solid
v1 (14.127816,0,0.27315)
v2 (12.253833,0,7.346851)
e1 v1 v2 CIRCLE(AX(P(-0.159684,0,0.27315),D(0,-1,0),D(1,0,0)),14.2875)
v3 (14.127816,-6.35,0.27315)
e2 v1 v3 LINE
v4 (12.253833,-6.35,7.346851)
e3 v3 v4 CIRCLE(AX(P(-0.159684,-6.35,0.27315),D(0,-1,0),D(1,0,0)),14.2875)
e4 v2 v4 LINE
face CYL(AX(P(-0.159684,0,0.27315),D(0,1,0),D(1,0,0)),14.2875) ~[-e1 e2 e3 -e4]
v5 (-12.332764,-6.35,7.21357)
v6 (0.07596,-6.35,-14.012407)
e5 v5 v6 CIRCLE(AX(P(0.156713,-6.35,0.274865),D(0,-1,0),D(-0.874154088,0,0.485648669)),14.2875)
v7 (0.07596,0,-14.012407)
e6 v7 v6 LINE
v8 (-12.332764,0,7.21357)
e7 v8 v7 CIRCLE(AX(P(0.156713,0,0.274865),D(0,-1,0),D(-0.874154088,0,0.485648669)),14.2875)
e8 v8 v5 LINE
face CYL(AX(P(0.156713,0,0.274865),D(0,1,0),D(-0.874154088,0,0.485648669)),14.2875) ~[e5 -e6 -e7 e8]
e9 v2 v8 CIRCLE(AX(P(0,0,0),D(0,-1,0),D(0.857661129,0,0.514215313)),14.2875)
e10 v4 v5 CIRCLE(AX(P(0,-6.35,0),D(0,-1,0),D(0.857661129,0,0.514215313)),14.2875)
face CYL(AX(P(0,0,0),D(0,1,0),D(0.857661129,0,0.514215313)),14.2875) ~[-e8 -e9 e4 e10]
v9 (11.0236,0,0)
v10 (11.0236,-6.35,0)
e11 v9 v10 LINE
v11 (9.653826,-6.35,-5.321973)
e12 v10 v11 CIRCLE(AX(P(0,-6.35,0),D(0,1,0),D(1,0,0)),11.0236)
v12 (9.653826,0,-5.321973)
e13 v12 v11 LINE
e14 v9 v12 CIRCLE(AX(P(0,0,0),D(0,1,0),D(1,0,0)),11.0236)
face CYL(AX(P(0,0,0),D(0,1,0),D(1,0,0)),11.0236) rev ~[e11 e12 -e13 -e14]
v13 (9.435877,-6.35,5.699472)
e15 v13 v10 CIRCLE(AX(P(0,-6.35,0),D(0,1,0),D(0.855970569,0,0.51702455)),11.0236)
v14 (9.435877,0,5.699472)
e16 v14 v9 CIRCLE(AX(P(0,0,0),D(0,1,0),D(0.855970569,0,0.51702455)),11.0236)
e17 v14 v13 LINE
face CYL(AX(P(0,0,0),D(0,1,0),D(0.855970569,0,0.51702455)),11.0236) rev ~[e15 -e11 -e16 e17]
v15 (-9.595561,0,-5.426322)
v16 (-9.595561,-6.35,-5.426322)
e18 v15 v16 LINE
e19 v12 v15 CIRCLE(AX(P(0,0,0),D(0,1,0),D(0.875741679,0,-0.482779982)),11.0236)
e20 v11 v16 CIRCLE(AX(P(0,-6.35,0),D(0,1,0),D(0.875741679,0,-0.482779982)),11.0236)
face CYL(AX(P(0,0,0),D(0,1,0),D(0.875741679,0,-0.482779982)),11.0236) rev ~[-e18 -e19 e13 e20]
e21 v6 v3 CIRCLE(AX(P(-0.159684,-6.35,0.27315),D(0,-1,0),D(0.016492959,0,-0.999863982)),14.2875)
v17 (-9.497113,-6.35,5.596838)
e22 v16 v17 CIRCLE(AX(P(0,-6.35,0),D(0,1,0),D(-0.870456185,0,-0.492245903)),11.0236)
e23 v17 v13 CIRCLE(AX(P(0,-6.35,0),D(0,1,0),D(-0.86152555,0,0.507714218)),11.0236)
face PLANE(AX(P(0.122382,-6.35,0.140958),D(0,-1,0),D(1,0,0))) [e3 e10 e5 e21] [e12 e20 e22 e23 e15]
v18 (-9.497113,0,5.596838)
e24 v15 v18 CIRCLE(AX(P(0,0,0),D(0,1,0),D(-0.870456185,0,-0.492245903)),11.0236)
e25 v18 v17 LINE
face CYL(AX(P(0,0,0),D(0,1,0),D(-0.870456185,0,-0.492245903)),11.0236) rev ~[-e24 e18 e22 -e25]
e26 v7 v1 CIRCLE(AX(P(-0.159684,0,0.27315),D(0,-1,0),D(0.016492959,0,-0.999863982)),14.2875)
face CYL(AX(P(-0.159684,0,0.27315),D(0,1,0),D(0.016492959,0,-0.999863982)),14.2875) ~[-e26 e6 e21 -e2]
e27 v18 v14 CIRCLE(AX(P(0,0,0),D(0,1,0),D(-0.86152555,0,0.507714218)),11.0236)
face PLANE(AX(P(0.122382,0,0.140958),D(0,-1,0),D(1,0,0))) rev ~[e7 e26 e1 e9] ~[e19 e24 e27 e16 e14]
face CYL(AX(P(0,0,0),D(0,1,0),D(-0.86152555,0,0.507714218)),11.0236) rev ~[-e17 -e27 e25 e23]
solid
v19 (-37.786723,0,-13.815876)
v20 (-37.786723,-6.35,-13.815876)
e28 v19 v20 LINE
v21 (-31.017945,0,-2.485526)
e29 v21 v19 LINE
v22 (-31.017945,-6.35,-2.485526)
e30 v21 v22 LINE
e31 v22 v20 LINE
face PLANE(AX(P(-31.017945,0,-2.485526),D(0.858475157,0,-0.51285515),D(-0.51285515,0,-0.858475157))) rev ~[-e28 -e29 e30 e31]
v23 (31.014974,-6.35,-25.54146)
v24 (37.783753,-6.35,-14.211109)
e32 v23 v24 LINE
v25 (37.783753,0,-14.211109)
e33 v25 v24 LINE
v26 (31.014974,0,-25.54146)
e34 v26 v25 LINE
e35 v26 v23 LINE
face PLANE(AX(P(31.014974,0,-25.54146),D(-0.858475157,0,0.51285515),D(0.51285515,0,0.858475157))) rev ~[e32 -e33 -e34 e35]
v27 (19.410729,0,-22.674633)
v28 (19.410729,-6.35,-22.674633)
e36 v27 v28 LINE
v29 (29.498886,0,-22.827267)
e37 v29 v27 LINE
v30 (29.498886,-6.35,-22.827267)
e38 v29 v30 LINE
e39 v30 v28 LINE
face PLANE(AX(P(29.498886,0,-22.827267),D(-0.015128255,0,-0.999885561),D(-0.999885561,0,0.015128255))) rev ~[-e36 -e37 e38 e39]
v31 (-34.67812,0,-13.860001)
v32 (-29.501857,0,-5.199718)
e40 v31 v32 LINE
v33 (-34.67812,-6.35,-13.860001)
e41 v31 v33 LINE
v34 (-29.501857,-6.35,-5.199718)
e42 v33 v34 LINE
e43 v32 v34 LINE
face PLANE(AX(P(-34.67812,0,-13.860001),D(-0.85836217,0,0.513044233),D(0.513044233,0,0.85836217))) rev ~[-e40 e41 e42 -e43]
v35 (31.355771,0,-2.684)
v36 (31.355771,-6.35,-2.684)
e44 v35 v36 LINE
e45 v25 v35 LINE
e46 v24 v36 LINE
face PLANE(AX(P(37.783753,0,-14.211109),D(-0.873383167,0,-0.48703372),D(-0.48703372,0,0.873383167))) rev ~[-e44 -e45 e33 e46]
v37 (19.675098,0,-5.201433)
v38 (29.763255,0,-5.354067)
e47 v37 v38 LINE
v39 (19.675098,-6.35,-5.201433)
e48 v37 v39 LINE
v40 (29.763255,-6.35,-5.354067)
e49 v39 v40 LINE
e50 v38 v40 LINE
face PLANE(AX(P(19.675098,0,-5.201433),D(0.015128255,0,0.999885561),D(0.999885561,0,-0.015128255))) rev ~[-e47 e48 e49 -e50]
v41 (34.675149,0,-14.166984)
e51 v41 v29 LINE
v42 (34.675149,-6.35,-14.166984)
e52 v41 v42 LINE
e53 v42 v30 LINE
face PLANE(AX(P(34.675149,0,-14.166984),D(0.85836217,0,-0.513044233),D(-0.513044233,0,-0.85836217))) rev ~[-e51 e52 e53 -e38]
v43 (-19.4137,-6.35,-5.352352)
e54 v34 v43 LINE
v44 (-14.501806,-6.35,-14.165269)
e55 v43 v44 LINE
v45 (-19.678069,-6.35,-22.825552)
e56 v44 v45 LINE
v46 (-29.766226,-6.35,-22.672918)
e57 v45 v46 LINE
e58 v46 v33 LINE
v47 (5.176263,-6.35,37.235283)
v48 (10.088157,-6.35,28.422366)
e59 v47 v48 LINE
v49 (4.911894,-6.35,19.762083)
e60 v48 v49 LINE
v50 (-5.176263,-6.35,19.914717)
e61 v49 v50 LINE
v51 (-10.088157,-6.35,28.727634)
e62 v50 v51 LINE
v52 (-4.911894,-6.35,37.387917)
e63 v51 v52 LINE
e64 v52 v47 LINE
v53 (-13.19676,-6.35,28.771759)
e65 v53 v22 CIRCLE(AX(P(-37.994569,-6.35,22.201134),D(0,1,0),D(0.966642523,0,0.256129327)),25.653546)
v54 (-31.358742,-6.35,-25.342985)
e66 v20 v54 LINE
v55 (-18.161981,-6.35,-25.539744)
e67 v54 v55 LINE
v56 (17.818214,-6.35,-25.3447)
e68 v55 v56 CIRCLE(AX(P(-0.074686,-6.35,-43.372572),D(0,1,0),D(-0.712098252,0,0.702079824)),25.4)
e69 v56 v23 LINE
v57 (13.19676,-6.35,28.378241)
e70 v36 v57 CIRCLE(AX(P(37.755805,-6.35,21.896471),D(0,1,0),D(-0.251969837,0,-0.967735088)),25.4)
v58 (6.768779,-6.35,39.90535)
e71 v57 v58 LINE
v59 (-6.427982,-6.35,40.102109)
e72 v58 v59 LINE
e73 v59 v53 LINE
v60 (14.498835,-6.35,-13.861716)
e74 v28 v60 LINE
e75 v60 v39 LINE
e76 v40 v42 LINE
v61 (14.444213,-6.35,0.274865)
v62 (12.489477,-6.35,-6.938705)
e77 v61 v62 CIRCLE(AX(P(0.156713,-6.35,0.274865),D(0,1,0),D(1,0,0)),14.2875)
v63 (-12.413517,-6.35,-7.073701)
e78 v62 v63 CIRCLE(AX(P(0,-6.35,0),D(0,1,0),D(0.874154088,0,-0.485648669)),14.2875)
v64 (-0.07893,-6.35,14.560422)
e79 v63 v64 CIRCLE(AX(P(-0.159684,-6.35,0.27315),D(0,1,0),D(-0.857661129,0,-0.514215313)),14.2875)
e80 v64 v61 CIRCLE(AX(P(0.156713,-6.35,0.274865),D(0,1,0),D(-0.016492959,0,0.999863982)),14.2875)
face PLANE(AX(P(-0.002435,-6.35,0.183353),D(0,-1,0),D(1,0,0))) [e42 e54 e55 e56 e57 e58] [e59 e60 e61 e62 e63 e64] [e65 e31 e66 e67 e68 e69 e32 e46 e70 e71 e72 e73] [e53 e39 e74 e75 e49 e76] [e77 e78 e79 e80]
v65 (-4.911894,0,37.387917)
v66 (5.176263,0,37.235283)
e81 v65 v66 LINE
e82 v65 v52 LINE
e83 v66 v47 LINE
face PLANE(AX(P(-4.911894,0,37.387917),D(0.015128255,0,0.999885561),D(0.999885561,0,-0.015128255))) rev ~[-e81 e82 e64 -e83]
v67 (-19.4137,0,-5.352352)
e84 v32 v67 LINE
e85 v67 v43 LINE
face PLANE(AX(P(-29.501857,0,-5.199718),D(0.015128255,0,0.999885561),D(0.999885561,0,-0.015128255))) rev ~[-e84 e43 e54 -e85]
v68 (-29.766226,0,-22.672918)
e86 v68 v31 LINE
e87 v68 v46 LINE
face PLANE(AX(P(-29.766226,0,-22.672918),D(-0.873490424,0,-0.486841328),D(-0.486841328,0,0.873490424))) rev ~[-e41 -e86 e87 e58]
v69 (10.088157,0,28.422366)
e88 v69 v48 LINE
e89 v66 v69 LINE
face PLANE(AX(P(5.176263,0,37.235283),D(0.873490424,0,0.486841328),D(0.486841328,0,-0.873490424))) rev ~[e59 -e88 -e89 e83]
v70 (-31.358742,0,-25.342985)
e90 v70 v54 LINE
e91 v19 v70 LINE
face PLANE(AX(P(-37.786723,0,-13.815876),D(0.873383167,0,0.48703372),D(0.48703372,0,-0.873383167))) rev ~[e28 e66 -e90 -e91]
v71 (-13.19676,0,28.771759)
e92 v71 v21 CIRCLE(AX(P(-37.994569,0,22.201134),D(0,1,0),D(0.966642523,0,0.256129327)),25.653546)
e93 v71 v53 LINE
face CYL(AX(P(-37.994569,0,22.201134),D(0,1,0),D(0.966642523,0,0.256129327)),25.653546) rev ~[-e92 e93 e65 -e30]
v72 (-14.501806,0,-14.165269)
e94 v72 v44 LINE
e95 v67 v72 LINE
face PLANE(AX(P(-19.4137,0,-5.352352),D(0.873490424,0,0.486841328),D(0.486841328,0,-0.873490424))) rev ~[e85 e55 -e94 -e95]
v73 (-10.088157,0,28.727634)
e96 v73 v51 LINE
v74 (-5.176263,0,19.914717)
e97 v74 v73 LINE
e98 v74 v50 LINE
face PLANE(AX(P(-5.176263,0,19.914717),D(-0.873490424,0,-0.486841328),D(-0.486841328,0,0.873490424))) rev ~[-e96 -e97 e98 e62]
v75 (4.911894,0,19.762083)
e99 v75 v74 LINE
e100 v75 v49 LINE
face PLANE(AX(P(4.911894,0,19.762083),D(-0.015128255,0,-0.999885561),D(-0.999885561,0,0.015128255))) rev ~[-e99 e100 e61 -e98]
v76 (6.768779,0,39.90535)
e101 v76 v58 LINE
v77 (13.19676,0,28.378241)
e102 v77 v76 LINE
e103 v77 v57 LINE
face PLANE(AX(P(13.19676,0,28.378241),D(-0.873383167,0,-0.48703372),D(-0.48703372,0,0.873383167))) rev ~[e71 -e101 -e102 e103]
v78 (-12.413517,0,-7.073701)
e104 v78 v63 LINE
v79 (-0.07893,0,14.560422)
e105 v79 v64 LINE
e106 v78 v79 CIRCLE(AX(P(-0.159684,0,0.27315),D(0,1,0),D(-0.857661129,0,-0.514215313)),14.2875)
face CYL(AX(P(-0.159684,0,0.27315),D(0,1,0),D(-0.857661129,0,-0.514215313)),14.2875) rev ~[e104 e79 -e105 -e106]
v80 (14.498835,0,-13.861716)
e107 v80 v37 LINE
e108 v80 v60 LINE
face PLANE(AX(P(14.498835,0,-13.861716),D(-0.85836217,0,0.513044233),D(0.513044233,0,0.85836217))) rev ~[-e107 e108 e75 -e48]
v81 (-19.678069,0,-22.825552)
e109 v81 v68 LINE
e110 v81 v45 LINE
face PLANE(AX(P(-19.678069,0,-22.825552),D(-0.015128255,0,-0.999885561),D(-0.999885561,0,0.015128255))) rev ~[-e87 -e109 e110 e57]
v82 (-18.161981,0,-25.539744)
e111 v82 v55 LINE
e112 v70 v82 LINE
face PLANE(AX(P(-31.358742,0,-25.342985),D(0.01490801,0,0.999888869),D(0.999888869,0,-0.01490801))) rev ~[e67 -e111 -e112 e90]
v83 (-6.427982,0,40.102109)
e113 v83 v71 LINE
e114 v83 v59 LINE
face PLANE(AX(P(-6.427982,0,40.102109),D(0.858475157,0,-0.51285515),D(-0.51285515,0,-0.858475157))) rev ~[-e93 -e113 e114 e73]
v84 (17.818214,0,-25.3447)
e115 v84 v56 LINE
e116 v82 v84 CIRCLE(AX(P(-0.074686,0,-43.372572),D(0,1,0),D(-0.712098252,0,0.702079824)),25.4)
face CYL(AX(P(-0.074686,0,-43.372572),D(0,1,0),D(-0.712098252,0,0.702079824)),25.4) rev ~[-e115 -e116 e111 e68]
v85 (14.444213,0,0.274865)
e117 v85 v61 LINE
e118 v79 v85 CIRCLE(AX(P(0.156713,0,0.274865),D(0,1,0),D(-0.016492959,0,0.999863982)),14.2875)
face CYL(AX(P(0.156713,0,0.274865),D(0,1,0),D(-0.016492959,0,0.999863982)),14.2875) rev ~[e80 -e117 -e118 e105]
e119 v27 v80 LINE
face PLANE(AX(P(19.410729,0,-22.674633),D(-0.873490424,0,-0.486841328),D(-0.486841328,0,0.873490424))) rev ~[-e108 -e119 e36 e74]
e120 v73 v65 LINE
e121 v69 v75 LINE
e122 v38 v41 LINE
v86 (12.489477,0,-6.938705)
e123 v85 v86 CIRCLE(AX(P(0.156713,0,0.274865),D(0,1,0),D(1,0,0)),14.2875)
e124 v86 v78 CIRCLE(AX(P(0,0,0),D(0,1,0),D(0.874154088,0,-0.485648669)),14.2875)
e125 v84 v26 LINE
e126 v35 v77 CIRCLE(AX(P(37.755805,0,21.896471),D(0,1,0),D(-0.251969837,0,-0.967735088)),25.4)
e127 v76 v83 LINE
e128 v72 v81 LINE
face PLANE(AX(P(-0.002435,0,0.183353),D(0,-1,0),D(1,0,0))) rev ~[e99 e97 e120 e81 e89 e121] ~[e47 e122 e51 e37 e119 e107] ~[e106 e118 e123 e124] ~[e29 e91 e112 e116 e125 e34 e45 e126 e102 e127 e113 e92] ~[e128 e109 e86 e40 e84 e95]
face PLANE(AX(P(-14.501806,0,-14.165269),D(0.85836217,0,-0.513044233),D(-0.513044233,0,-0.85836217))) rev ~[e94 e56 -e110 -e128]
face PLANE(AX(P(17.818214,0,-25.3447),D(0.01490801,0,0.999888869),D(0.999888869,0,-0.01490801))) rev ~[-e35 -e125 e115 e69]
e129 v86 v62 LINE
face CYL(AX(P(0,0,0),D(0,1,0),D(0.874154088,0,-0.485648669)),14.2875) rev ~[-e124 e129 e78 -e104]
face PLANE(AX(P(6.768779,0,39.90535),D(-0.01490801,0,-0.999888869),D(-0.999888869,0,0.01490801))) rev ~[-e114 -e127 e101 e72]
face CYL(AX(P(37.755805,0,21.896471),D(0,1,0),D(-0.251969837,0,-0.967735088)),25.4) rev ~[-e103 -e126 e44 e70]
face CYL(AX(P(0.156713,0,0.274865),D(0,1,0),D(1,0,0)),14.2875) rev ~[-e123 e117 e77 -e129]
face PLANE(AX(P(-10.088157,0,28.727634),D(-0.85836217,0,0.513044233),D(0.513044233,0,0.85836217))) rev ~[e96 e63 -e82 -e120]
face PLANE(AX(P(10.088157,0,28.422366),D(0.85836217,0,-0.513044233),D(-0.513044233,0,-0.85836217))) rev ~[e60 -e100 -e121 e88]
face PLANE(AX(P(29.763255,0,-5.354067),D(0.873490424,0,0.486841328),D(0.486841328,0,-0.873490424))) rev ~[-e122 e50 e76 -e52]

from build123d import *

# Parameters (mm, degrees)
F1_DEPTH = 6.35


# Not quite as in the source:
# - a feature names something its author has since deleted; it is built from what else it names


with BuildPart() as f1:
    # F0 (on Front) → F1 (new body)
    with BuildSketch(Plane.XZ):
        with BuildLine():
            ThreePointArc((14.1278163557, 0.2731498923), (13.651376792, 3.9320111734), (12.2538333812, 7.346851279))
            ThreePointArc((12.2538333812, 7.346851279), (-0.0774496188, 14.2872900792), (-12.3327636124, 7.2135704011))
            ThreePointArc((-12.3327636124, 7.2135704011), (-12.1777184268, -6.9358533383), (0.0759595105, -14.012406749))
            ThreePointArc((0.0759595105, -14.012406749), (10.026076215, -9.745979428), (14.1278163557, 0.2731498923))
        make_face()
        with BuildLine():
            ThreePointArc((11.1803129237, 0.2748650387), (10.7918465004, -2.6257712301), (9.6538259749, -5.3219734128))
            ThreePointArc((9.6538259749, -5.3219734128), (0.0597566836, -11.0234380344), (-9.5955608055, -5.4263219393))
            ThreePointArc((-9.5955608055, -5.4263219393), (-9.736139361, 5.7331181035), (-0.0612358901, 11.2963102831))
            ThreePointArc((-0.0612358901, 11.2963102831), (7.874134009, 8.1464067398), (11.1803129237, 0.2748650387))
        make_face(mode=Mode.SUBTRACT)
        with BuildLine():
            ThreePointArc((9.4358771612, 5.6994718316), (10.6192535621, 2.9582445374), (11.0236, 0))
            ThreePointArc((11.0236, 0), (10.6756656227, -2.7477118611), (9.6538259749, -5.3219734128))
            ThreePointArc((9.6538259749, -5.3219734128), (10.7918465004, -2.6257712301), (11.1803129237, 0.2748650387))
            ThreePointArc((11.1803129237, 0.2748650387), (7.874134009, 8.1464067398), (-0.0612358901, 11.2963102831))
            ThreePointArc((-0.0612358901, 11.2963102831), (5.4371548072, 9.7702629436), (9.4358771612, 5.6994718316))
        make_face()
        with BuildLine():
            ThreePointArc((-9.4971130513, 5.5968384515), (-0.0597566836, 11.0234380344), (9.4358771612, 5.6994718316))
            ThreePointArc((9.4358771612, 5.6994718316), (5.4371548072, 9.7702629436), (-0.0612358901, 11.2963102831))
            ThreePointArc((-0.0612358901, 11.2963102831), (-5.542758908, 9.7107421999), (-9.4971130513, 5.5968384515))
        make_face()
        with BuildLine():
            ThreePointArc((-9.5955608055, -5.4263219393), (-11.0231603907, 0.0984477542), (-9.4971130513, 5.5968384515))
            ThreePointArc((-9.4971130513, 5.5968384515), (-5.542758908, 9.7107421999), (-0.0612358901, 11.2963102831))
            ThreePointArc((-0.0612358901, 11.2963102831), (-9.736139361, 5.7331181035), (-9.5955608055, -5.4263219393))
        make_face()
    extrude(amount=F1_DEPTH)


with BuildPart() as f1b:
    # F0 (on Front) → F1, piece 2 (new body)
    with BuildSketch(Plane.XZ):
        with BuildLine():
            ThreePointArc((31.3557710331, -2.6839999789), (15.827926935, 9.0774163735), (13.1967604274, 28.378240702))
            Line((13.1967604274, 28.378240702), (6.4279816632, 17.0478905732))
            Line((6.4279816632, 17.0478905732), (-6.7687787642, 17.2446498712))
            Line((-6.7687787642, 17.2446498712), (-13.1967604274, 28.771759298))
            ThreePointArc((-13.1967604274, 28.771759298), (-15.7087414623, 9.494980858), (-31.0179446527, -2.4855255345))
            Line((-31.0179446527, -2.4855255345), (-17.8211842253, -2.6822848325))
            Line((-17.8211842253, -2.6822848325), (-11.3932025621, -14.2093942593))
            Line((-11.3932025621, -14.2093942593), (-18.1619813263, -25.5397443881))
            ThreePointArc((-18.1619813263, -25.5397443881), (-0.2123739316, -17.9729451093), (17.8182135046, -25.3447002365))
            Line((17.8182135046, -25.3447002365), (11.3902318414, -13.8175908097))
            Line((11.3902318414, -13.8175908097), (18.1590106056, -2.4872406809))
            Line((18.1590106056, -2.4872406809), (31.3557710331, -2.6839999789))
        make_face()
        with BuildLine():
            ThreePointArc((14.4442129237, 0.2748650387), (13.9468727552, -3.4619983612), (12.489476536, -6.9387053624))
            ThreePointArc((12.489476536, -6.9387053624), (0.0774496188, -14.2872900792), (-12.4135170255, -7.0737013866))
            ThreePointArc((-12.4135170255, -7.0737013866), (-12.5715646135, 7.3497215946), (-0.0789302311, 14.5604216801))
            ThreePointArc((-0.0789302311, 14.5604216801), (10.175842244, 10.460624898), (14.4442129237, 0.2748650387))
        make_face(mode=Mode.SUBTRACT)
        Polygon((6.4279816632, 17.0478905732), (13.1967604274, 28.378240702), (6.7687787642, 39.9053501288), (-6.4279816632, 40.1021094268), (-13.1967604274, 28.771759298), (-6.7687787642, 17.2446498712), align=None)
        Polygon((5.1762630455, 37.2352832458), (10.0881568176, 28.4223663289), (4.9118937721, 19.7620830831), (-5.1762630455, 19.9147167542), (-10.0881568176, 28.7276336711), (-4.9118937721, 37.3879169169), align=None, mode=Mode.SUBTRACT)
        Polygon((37.7837526963, -14.2111094057), (31.3557710331, -2.6839999789), (18.1590106056, -2.4872406809), (11.3902318414, -13.8175908097), (17.8182135046, -25.3447002365), (31.0149739321, -25.5414595345), align=None)
        Polygon((14.4988354513, -13.8617164365), (19.6750984967, -5.2014331907), (29.7632553143, -5.3540668619), (34.6751490864, -14.1669837788), (29.4988860409, -22.8272670246), (19.4107292234, -22.6746333535), align=None, mode=Mode.SUBTRACT)
        Polygon((-17.8211842253, -2.6822848325), (-31.0179446527, -2.4855255345), (-37.7867234169, -13.8158756633), (-31.3587417537, -25.3429850901), (-18.1619813263, -25.5397443881), (-11.3932025621, -14.2093942593), align=None)
        Polygon((-19.413699944, -5.3523517155), (-14.5018061719, -14.1652686324), (-19.6780692174, -22.8255518782), (-29.7662260349, -22.6729182071), (-34.678119807, -13.8600012902), (-29.5018567616, -5.1997180444), align=None, mode=Mode.SUBTRACT)
    extrude(amount=F1_DEPTH)


solid = Compound([f1.part, f1b.part])
